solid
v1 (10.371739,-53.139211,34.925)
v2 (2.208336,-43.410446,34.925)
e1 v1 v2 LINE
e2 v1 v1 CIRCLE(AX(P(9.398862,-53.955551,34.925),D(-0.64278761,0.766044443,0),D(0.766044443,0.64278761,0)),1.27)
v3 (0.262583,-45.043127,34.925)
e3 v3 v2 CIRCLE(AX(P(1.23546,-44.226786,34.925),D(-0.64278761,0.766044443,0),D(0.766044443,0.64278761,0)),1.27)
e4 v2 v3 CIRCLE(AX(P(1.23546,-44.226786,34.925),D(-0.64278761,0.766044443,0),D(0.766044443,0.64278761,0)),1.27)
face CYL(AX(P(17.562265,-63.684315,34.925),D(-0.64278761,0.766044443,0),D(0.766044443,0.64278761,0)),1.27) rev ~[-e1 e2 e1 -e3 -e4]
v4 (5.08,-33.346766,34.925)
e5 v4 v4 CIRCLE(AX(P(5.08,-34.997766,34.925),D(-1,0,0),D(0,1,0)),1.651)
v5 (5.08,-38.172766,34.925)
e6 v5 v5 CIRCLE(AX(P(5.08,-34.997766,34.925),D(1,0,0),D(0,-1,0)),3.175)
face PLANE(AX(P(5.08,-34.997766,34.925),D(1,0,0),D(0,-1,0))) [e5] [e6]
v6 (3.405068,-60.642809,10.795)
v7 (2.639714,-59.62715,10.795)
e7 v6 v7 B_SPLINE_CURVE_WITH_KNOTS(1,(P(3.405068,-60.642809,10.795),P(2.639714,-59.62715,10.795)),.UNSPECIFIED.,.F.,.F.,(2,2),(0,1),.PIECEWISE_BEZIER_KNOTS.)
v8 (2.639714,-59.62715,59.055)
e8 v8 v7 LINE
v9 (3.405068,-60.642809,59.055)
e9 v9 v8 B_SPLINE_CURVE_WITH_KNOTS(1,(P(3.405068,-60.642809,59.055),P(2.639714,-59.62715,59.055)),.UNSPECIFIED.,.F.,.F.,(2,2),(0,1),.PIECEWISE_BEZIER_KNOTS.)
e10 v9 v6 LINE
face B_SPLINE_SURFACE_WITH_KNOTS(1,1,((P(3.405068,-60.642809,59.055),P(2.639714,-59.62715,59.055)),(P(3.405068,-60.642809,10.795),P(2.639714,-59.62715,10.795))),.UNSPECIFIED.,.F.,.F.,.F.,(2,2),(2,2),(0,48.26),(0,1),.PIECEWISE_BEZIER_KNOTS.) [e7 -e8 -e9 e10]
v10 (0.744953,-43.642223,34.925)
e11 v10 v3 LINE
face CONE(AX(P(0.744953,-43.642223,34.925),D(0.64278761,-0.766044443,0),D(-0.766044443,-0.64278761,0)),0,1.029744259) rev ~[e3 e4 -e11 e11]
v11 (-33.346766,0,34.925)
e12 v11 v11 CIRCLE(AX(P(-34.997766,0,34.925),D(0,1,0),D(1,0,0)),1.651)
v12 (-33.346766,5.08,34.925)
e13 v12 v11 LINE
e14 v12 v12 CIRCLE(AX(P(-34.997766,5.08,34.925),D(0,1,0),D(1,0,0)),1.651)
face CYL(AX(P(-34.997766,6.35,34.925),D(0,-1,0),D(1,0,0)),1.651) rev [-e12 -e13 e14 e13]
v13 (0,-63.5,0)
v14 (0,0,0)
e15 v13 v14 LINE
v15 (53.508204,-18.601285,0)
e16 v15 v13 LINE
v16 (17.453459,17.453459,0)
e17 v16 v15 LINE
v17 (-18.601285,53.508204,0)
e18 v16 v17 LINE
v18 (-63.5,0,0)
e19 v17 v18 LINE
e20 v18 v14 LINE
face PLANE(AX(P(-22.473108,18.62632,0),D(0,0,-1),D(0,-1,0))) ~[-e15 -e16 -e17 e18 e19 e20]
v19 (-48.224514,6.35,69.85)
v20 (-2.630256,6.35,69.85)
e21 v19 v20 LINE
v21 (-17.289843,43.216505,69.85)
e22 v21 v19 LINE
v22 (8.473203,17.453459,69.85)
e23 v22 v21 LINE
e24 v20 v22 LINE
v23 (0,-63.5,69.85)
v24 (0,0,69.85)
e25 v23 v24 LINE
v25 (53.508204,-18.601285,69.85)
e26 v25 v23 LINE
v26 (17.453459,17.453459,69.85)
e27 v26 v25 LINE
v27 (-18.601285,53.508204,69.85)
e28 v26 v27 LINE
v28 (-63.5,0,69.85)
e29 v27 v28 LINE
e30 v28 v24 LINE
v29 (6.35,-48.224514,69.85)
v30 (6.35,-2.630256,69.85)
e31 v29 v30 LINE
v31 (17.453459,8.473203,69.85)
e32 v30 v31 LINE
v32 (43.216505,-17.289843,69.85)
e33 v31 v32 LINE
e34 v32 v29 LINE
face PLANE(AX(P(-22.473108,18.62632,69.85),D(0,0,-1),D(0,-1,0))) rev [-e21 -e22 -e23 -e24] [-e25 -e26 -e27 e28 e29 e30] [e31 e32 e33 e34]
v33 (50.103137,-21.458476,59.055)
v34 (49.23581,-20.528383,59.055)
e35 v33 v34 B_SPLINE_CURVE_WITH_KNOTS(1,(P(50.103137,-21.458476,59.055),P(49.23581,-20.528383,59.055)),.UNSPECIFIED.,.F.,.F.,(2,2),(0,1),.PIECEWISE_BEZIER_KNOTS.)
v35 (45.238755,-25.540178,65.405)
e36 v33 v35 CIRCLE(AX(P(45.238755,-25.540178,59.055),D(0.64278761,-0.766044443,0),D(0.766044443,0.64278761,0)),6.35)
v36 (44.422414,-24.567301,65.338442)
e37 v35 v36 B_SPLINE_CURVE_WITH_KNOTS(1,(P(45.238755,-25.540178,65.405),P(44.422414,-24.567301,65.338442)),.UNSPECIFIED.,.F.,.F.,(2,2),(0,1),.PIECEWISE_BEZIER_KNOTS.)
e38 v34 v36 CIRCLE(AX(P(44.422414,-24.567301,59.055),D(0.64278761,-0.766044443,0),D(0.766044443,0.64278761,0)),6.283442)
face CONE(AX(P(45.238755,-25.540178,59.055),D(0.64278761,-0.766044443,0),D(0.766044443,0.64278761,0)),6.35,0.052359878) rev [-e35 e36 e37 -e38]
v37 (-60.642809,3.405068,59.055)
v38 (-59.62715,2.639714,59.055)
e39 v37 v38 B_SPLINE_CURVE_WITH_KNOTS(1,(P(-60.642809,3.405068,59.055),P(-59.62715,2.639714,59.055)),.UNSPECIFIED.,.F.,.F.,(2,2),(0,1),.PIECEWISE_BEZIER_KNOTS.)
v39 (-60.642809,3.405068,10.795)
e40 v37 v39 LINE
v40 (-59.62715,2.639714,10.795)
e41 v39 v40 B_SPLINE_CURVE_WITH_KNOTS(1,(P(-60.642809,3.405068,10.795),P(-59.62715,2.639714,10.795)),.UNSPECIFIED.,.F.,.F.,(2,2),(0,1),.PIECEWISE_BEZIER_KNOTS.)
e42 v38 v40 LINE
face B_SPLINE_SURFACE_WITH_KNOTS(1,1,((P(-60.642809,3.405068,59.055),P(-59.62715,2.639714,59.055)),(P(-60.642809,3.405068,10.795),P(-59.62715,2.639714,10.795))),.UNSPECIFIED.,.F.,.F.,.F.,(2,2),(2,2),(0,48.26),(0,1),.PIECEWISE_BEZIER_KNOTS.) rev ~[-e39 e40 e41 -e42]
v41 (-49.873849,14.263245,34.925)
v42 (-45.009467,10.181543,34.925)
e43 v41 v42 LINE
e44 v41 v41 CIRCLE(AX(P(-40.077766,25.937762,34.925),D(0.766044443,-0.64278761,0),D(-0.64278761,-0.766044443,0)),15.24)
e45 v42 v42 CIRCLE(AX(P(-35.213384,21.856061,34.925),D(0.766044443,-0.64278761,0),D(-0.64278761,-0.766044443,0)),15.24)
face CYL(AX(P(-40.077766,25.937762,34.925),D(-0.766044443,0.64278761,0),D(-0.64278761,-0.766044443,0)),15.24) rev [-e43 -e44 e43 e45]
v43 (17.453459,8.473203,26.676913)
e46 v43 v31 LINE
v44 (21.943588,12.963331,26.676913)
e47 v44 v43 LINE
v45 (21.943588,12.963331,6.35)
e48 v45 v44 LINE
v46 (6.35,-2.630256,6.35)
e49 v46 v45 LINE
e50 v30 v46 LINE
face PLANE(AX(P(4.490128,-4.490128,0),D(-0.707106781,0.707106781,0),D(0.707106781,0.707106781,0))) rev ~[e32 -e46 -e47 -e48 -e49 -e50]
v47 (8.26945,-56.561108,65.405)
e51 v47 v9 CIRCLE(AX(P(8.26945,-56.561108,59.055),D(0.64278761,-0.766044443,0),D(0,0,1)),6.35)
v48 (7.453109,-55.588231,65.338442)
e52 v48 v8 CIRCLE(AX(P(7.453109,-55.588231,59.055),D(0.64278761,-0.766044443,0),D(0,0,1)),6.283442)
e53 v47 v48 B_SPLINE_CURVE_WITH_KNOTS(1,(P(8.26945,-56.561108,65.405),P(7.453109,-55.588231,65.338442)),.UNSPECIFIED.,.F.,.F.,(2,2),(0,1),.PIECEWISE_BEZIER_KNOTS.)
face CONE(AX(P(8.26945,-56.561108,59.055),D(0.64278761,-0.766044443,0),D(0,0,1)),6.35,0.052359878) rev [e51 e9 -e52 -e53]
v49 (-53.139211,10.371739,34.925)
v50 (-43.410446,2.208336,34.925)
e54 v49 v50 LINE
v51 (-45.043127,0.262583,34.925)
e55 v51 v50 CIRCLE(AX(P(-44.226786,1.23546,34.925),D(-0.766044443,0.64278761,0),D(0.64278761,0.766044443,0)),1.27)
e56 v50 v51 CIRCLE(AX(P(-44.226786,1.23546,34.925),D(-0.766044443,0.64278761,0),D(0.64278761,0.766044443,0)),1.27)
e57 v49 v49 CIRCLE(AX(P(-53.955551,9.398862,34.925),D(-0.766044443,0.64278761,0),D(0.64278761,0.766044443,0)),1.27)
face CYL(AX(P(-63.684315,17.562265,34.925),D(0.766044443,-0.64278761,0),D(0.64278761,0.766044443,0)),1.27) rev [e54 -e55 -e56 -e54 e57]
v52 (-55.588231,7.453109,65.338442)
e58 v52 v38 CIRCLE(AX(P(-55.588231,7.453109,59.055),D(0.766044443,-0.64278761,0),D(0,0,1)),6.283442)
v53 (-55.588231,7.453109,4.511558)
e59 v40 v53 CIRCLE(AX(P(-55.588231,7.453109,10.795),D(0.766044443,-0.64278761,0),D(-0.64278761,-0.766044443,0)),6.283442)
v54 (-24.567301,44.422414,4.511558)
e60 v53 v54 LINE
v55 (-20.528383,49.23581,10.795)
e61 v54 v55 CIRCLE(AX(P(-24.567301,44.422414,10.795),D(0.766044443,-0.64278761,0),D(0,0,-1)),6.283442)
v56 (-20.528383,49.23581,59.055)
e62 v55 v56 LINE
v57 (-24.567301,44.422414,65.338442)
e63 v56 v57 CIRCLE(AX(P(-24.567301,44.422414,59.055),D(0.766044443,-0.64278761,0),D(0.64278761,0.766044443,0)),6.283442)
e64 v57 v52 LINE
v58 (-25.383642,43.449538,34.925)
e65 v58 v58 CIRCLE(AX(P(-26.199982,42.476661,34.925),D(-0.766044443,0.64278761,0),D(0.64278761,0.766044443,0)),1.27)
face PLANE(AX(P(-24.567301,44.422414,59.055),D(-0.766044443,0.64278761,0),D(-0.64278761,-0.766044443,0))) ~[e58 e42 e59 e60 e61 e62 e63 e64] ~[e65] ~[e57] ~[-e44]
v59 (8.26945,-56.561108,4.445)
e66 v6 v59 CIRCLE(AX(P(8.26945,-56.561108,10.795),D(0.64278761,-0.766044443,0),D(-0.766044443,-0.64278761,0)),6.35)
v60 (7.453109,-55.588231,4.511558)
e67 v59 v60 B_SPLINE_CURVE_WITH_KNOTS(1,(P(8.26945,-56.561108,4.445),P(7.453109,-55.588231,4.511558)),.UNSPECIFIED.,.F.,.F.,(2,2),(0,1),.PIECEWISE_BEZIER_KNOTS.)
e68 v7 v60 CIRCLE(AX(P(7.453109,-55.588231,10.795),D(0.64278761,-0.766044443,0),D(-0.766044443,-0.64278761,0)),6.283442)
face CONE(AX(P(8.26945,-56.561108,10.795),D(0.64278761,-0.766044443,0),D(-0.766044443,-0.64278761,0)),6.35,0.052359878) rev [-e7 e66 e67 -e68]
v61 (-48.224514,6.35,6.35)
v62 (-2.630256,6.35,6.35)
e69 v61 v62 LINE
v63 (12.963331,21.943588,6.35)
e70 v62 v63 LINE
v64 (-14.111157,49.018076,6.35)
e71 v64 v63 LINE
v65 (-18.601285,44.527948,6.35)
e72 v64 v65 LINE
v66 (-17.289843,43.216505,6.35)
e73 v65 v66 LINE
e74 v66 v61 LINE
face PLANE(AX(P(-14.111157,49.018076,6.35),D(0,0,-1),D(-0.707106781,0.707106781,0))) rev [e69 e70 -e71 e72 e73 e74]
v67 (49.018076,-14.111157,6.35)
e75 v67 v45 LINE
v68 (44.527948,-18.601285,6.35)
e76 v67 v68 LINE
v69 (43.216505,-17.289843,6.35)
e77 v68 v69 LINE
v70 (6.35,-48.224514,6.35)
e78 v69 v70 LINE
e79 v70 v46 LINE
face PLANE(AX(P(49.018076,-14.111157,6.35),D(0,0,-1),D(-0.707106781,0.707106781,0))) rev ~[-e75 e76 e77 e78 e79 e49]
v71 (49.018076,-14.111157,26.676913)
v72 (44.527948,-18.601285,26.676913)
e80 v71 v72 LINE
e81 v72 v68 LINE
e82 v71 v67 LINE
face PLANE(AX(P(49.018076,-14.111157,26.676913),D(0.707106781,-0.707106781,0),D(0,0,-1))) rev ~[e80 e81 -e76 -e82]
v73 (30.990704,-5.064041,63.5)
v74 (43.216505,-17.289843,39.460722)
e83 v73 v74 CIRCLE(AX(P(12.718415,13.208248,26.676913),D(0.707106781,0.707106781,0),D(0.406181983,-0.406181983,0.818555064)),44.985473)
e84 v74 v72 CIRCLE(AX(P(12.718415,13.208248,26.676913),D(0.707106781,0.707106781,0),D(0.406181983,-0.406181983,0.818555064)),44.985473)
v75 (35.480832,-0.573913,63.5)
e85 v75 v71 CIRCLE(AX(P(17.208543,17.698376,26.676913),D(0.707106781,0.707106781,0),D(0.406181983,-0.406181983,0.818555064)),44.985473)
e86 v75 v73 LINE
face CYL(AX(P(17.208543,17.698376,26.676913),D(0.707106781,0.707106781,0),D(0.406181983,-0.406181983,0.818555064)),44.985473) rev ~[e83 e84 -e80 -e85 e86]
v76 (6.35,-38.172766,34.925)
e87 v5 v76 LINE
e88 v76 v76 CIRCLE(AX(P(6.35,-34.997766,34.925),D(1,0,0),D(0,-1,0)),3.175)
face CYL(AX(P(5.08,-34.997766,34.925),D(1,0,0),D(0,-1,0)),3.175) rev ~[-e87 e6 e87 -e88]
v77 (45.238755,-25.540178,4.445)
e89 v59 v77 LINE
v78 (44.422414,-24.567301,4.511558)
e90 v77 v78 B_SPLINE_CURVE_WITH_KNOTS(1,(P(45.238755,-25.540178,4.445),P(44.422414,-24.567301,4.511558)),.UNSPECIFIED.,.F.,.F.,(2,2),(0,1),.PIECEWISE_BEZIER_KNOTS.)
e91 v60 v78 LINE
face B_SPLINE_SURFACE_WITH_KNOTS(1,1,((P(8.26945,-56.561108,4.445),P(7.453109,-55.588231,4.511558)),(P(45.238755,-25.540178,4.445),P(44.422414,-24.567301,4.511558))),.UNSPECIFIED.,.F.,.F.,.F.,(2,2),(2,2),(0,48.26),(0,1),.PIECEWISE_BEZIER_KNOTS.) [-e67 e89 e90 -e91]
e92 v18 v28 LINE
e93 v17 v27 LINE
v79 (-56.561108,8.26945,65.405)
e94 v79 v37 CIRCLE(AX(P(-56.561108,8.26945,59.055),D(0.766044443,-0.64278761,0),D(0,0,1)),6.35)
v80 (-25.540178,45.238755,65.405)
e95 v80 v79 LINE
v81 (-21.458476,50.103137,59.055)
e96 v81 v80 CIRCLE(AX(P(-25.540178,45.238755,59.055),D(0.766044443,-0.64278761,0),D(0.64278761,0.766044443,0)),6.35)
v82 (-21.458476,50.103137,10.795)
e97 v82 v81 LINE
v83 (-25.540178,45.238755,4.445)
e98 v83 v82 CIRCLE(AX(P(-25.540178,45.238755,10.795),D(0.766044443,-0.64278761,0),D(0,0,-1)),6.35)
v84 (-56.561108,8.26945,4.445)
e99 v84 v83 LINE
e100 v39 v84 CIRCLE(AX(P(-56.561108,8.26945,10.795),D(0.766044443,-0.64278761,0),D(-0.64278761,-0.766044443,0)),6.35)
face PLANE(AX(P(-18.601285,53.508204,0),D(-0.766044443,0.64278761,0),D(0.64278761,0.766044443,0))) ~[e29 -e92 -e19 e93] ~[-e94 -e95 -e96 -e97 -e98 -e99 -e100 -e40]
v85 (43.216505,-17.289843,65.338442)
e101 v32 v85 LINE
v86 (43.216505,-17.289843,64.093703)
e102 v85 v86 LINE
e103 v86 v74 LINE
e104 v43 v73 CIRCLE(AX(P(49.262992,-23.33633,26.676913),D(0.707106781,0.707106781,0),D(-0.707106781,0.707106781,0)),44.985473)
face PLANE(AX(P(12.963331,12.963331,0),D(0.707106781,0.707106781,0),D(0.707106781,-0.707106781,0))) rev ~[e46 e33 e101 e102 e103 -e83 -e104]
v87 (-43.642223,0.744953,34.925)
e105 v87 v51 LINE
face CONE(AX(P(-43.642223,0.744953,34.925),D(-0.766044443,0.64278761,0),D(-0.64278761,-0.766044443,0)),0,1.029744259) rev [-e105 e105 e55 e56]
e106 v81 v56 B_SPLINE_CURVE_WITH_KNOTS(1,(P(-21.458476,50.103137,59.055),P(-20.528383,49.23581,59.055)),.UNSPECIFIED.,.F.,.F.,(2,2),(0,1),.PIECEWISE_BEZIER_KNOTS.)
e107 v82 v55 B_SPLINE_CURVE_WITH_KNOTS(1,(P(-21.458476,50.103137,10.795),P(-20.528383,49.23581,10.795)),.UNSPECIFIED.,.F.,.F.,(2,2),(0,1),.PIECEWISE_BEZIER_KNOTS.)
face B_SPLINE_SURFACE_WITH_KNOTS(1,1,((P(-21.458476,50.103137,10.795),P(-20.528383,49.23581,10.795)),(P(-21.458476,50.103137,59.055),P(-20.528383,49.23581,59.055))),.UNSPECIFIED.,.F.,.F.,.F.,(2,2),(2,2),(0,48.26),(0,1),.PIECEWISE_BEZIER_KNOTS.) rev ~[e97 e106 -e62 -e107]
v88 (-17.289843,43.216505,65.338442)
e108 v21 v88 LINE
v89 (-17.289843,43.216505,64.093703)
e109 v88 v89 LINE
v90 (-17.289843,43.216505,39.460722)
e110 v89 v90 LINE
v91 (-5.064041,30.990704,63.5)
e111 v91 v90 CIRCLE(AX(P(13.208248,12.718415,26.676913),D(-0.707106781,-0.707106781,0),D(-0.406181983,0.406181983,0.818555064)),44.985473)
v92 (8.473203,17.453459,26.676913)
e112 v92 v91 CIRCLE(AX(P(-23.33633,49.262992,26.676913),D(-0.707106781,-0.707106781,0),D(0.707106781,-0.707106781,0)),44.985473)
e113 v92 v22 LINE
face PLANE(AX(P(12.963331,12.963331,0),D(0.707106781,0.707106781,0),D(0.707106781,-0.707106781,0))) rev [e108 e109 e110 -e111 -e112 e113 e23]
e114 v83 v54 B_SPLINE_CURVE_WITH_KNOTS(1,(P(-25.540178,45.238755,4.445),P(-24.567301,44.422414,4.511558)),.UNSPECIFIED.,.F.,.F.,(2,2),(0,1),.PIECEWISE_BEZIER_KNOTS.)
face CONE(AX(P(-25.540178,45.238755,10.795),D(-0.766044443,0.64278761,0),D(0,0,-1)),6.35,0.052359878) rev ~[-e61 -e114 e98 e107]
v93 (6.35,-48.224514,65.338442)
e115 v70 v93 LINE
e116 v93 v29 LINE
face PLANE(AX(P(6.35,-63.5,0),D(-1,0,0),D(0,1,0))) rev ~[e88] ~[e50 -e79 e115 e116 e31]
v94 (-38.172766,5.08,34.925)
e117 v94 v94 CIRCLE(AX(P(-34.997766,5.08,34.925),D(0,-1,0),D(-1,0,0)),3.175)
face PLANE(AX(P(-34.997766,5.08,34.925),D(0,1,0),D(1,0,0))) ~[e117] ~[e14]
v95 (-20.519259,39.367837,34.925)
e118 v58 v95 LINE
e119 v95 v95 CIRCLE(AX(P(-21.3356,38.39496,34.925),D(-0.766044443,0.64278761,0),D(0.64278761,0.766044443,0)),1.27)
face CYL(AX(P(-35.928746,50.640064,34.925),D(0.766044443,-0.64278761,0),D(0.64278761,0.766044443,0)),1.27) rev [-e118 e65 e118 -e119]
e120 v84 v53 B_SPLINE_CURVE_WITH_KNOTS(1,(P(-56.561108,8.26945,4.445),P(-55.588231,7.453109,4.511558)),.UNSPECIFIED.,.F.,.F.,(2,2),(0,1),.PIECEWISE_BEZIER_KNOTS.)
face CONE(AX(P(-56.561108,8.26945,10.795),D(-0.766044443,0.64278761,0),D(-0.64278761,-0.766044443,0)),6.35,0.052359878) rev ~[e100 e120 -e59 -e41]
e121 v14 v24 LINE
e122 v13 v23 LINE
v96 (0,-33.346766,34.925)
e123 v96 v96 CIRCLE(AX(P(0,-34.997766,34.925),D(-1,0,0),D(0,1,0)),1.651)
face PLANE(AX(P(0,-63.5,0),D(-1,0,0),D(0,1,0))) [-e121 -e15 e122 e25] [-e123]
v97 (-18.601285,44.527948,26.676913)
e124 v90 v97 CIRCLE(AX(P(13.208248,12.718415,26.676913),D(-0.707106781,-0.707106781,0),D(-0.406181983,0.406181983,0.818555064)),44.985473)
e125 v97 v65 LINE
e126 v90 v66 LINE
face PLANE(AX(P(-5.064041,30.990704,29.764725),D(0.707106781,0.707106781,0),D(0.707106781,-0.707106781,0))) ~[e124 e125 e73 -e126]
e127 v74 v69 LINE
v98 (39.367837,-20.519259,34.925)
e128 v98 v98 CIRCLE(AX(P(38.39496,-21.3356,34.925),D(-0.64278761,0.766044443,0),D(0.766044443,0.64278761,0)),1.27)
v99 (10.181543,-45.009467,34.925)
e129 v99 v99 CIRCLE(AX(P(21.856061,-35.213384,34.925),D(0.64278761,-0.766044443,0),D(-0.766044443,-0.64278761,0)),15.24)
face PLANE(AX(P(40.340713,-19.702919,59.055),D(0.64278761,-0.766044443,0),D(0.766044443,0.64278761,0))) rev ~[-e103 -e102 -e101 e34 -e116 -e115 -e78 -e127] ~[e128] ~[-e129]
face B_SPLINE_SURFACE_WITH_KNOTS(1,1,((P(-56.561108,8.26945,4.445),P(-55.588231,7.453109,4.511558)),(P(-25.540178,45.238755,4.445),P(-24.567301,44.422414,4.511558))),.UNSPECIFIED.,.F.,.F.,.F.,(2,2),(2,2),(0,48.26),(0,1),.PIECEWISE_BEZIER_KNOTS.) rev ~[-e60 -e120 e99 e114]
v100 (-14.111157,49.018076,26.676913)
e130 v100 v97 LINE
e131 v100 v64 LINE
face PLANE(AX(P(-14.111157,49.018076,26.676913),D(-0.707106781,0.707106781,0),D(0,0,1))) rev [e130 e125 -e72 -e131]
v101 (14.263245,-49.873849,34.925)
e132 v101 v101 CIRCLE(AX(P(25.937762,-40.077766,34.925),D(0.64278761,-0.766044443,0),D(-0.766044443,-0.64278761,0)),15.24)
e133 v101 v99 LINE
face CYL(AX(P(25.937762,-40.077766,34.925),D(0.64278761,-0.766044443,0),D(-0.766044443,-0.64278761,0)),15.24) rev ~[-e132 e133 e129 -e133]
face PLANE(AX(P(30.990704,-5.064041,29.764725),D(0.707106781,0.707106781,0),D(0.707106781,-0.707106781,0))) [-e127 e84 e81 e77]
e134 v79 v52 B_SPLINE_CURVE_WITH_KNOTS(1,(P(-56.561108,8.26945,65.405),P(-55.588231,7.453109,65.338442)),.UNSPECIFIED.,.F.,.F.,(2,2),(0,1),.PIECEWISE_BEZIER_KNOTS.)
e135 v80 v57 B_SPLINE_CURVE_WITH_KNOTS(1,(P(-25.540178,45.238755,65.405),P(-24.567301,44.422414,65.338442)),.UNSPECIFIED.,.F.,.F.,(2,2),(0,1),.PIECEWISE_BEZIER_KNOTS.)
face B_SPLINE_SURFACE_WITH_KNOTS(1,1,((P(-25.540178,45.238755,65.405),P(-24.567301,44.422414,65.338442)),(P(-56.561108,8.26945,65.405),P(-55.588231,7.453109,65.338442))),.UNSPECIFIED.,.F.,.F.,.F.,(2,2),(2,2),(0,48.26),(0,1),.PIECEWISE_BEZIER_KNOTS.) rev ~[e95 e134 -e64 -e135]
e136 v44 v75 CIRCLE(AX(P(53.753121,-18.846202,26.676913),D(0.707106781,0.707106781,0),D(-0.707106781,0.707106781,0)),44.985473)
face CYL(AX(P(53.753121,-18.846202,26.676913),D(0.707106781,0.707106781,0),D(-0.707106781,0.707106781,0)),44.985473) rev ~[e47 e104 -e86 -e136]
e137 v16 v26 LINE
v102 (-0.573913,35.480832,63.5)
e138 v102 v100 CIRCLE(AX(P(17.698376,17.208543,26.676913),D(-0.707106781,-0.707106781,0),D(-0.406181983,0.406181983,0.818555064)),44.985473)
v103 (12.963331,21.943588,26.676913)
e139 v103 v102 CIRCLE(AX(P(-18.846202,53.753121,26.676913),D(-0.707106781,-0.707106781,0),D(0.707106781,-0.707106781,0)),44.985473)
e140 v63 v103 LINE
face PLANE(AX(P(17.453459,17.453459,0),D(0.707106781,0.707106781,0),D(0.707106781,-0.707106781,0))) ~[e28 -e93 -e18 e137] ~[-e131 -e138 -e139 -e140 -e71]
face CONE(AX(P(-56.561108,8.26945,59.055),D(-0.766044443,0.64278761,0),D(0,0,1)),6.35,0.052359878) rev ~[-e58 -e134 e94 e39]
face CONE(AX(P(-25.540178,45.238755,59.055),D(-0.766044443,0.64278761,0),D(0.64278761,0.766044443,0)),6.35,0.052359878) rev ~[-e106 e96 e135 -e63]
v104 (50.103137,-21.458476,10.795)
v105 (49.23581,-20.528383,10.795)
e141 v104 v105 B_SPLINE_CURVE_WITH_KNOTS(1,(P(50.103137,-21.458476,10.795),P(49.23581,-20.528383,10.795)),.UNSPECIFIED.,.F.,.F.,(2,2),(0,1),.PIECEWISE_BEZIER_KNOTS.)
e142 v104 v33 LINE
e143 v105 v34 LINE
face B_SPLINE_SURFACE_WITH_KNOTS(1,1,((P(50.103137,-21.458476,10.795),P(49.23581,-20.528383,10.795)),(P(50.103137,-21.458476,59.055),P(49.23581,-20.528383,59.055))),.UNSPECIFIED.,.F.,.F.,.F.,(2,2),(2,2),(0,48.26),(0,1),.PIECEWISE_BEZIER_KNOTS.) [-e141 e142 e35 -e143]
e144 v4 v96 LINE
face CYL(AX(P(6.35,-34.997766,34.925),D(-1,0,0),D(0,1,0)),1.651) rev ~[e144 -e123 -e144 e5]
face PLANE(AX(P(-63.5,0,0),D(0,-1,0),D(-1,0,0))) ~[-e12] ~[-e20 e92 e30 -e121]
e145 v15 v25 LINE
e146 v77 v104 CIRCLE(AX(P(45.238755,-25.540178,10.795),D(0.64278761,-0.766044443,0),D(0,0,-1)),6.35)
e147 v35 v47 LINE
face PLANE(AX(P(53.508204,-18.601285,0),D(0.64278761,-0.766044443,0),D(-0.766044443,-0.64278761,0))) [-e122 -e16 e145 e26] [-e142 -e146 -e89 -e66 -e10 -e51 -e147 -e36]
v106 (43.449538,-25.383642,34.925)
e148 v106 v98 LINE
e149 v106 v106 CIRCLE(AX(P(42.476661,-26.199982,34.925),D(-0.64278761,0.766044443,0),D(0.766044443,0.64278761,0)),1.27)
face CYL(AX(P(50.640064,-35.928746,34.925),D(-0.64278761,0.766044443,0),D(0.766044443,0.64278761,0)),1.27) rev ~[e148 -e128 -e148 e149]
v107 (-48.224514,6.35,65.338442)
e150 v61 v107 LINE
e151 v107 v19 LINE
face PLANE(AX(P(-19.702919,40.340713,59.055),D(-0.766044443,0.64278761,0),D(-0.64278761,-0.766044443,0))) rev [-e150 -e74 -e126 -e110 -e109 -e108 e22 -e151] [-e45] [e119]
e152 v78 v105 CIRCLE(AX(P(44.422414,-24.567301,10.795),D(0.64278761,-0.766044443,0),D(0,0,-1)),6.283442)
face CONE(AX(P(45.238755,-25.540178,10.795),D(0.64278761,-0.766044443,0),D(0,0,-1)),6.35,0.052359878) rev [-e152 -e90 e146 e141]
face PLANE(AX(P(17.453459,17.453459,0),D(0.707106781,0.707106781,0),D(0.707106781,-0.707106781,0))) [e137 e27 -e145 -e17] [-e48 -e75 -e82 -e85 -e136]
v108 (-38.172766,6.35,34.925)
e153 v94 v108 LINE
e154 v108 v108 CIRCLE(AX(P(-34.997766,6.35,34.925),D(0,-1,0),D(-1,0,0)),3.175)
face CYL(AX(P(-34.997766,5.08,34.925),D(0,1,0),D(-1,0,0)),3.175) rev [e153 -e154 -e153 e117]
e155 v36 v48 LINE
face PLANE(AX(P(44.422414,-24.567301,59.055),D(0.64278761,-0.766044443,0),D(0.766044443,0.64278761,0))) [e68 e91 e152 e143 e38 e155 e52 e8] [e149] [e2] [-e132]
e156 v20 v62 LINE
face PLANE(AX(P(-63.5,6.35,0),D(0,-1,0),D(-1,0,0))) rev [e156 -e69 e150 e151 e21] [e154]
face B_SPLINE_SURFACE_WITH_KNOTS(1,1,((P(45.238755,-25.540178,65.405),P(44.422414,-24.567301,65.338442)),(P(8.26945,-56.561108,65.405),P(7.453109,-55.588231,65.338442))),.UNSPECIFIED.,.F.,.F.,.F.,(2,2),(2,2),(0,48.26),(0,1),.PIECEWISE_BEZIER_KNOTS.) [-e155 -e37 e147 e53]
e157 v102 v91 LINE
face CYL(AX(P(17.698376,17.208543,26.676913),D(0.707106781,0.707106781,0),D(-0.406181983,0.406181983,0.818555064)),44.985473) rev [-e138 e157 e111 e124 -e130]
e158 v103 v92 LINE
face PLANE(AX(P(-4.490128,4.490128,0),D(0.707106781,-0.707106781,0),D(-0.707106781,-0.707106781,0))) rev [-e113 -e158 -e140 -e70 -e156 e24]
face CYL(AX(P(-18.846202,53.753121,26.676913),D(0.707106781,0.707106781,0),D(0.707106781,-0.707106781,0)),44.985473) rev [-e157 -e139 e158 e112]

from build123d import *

# Parameters (mm, degrees)
F1_DEPTH        = 69.85
F3_DEPTH        = 1.27
F3_TAPER        = 3
F4_T            = 6.35
F4_T3_DEPTH     = 60.96
F4_T5_DEPTH     = 60.96
F4_T7_DEPTH     = 60.96
F4_T10_ANGLE    = 90.000000001
F4_T12_ANGLE    = 90.000000001
F4_T14_ANGLE    = 90.000000001
F4_T16_ANGLE    = 90.000000001
F6_DEPTH        = 6.35
F8_D            = 2.54
F8_DEPTH        = 12.7
F8_TIP          = 0.7630929862
F7_R            = 15.24
F9_DEPTH        = 6.3499999999
F11_D           = 3.302
F11_DEPTH       = 12.7
F11_CBORE_D     = 6.35
F11_CBORE_DEPTH = 1.27
F11_TIP         = 0.992020882
F13_ANGLE       = 180


# Not quite as in the source:
# - a shell that OpenCascade refuses in one call is made with other operations: the cavity is built on its own and cut out


with BuildPart() as f1:
    # F0 (on Top) → F1 (new body)
    with BuildSketch(Plane.XY):
        Polygon((0, 63.5), (0, 0), (17.4534594442, -17.4534594442), (53.5082043519, 18.6012854634), align=None)
    extrude(amount=-F1_DEPTH)

    # F2 (on face) → F3 (cut)
    with BuildSketch(Plane(origin=(31.2676461581, 37.2633296409, 0), x_dir=(-0.7660444431, 0.6427876097, 0), z_dir=(0.6427876097, 0.7660444431, 0))):
        with BuildLine():
            ThreePointArc((-24.5879867849, -59.055), (-22.7281148454, -63.5451280605), (-18.2379867849, -65.405))
            Line((-18.2379867849, -65.405), (30.0220132151, -65.405))
            ThreePointArc((30.0220132151, -65.405), (34.5121412756, -63.5451280605), (36.3720132151, -59.055))
            Line((36.3720132151, -59.055), (36.3720132151, -10.795))
            ThreePointArc((36.3720132151, -10.795), (34.5121412756, -6.3048719395), (30.0220132151, -4.445))
            Line((30.0220132151, -4.445), (-18.2379867849, -4.445))
            ThreePointArc((-18.2379867849, -4.445), (-22.7281148454, -6.3048719395), (-24.5879867849, -10.795))
            Line((-24.5879867849, -10.795), (-24.5879867849, -59.055))
        make_face()
    extrude(amount=-F3_DEPTH, taper=F3_TAPER, mode=Mode.SUBTRACT)

    # F4: shell of thickness 6.35, made by hand


with BuildPart() as f4_core1:
    # F4_t2: copy of F1
    add(f1.part)

    # the walls: a layer under each face that stays
    f4_faces = [f4_core1.faces().sort_by_distance(p)[0] for p in [
        (49.6861897553, 21.8083365017, -64.8607142857),
        (35.480831898, 0.5739130096, -34.925),
        (26.7541021759, 23.0232702779, 0),
        (0, 31.75, -34.925),
        (48.2521957288, 22.1826667317, -63.5215962965),
        (26.3459320438, 40.5642045103, -65.3717210602),
        (4.4396683587, 58.9457422889, -63.5215962965),
        (3.0223905645, 60.1349795634, -34.925),
        (4.4396683587, 58.9457422889, -6.3284037035),
        (26.3459320438, 40.5642045103, -4.4782789398),
        (48.2521957288, 22.1826667317, -6.3284037035),
        (49.6694735231, 20.9934294573, -34.925),
        (8.7267297221, -8.7267297221, -34.925),
        (25.9377619116, 40.0777662889, -34.925),
    ]]
    thicken(f4_faces, amount=-F4_T, mode=Mode.SUBTRACT)

    # F4_s4 → F4_t3 (cut)
    with BuildSketch(Plane(origin=(18.8354906441, -15.8048532525, 0), x_dir=(0, 0, 1), z_dir=(-0.7660444431, 0.6427876097, 0))):
        Polygon((-65.2750291449, 47.4406454713), (-71.679739666, 47.0414888159), (-71.3643671189, 41.0238221381), (-65.3384421203, 41.0238221381), align=None)
    extrude(amount=F4_T3_DEPTH, mode=Mode.SUBTRACT)

    # F4_s6 → F4_t5 (cut)
    with BuildSketch(Plane.XY.offset(-65.405)):
        Polygon((2.7312439473, 59.63757862), (-2.4316219096, 63.4486754488), (-6.0581141021, 58.636157764), (-1.4419877423, 54.762767838), align=None)
        Polygon((49.2301862972, 20.6203332441), (53.8799062493, 16.1976929397), (49.7702352824, 11.7906103863), (45.1541089225, 15.6640003123), align=None)
    extrude(amount=F4_T5_DEPTH, mode=Mode.SUBTRACT)

    # F4_s8 → F4_t7 (cut)
    with BuildSketch(Plane(origin=(-27.8625786085, 23.379479434, 0), x_dir=(0, 0, 1), z_dir=(0.7660444431, -0.6427876097, 0))):
        Polygon((-4.5749708551, -47.4406454713), (1.829739666, -47.0414888159), (1.514367119, -41.0238221381), (-4.5115578797, -41.0238221381), align=None)
    extrude(amount=F4_T7_DEPTH, mode=Mode.SUBTRACT)

    # F4_s9 → F4_t10 (revolve, cut)
    with BuildSketch(Plane.XY.offset(-59.055)):
        Polygon((49.2301862972, 20.6203332441), (53.8799062493, 16.1976929397), (49.7702352824, 11.7906103863), (45.1541089225, 15.6640003123), align=None)
    revolve(axis=Axis((44.4224143241, 24.5673012672, -59.055), (0.6427876097, 0.7660444431, 0)), revolution_arc=F4_T10_ANGLE, mode=Mode.SUBTRACT)

    # F4_s11 → F4_t12 (revolve, cut)
    with BuildSketch(Plane(origin=(-22.9981963947, 19.2977781125, 0), x_dir=(0, 0, 1), z_dir=(0.7660444431, -0.6427876097, 0))):
        Polygon((-65.2750291449, -47.4406454713), (-71.679739666, -47.0414888159), (-71.364367119, -41.0238221381), (-65.3384421203, -41.0238221381), align=None)
    revolve(axis=Axis((7.4531094992, 55.5882313107, -59.055), (0.6427876097, 0.7660444431, 0)), revolution_arc=F4_T12_ANGLE, mode=Mode.SUBTRACT)

    # F4_s13 → F4_t14 (revolve, cut)
    with BuildSketch(Plane.XY.offset(-10.795)):
        Polygon((2.7312439473, 59.63757862), (-2.4316219096, 63.4486754488), (-6.0581141021, 58.636157764), (-1.4419877423, 54.762767838), align=None)
    revolve(axis=Axis((7.4531094992, 55.5882313107, -10.795), (0.6427876097, 0.7660444431, 0)), revolution_arc=F4_T14_ANGLE, mode=Mode.SUBTRACT)

    # F4_s15 → F4_t16 (revolve, cut)
    with BuildSketch(Plane(origin=(13.9711084303, -11.723151931, 0), x_dir=(0, 0, 1), z_dir=(-0.7660444431, 0.6427876097, 0))):
        Polygon((-4.5749708551, 47.4406454713), (1.829739666, 47.0414888159), (1.514367119, 41.0238221381), (-4.5115578797, 41.0238221381), align=None)
    revolve(axis=Axis((44.4224143241, 24.5673012672, -10.795), (0.6427876097, 0.7660444431, 0)), revolution_arc=F4_T16_ANGLE, mode=Mode.SUBTRACT)


with BuildPart() as f1_1:
    add(f1.part)

    # what is left inside the walls is the cavity
    f4_cavity = [f4_core1.part.solids().sort_by_distance(p)[0] for p in [
        (24.742436, 32.708534, -27.516667),
    ]]
    add(f4_cavity, mode=Mode.SUBTRACT)

    # F5 (on face) → F6 (cut, through all)
    with BuildSketch(Plane(origin=(17.4534594442, -17.4534594442, 0), x_dir=(0.7071067812, 0.7071067812, 0), z_dir=(0.7071067812, -0.7071067812, 0))):
        with BuildLine():
            Line((44.6391092363, -6.35), (6.35, -6.35))
            Line((6.35, -6.35), (6.35, -26.6769132179))
            ThreePointArc((6.35, -26.6769132179), (11.4220747655, -47.42814024), (25.4945546181, -63.5))
            ThreePointArc((25.4945546181, -63.5), (39.5670344708, -47.42814024), (44.6391092363, -26.6769132179))
            Line((44.6391092363, -26.6769132179), (44.6391092363, -6.35))
        make_face()
    extrude(amount=-F6_DEPTH, mode=Mode.SUBTRACT)

    # F8
    with Locations(Plane(origin=(30.4513058938, 36.2904531982, 0), x_dir=(-0.7660444431, 0.6427876097, 0), z_dir=(0.6427876097, 0.7660444431, 0))):
        with Locations((27.4820132151, -34.925), (-15.6979867849, -34.925)):
            Hole(F8_D / 2, depth=F8_DEPTH)
            with Locations((0, 0, -(F8_DEPTH + F8_TIP / 2))):  # 118° drill point
                Cone(0, F8_D / 2, F8_TIP, mode=Mode.SUBTRACT)

    # F7 (on face) → F9 (cut, through all)
    with BuildSketch(Plane(origin=(30.4513058938, 36.2904531982, 0), x_dir=(-0.7660444431, 0.6427876097, 0), z_dir=(0.6427876097, 0.7660444431, 0))):
        with Locations((5.8920132151, -34.925)):
            Circle(F7_R)
    extrude(amount=-F9_DEPTH, mode=Mode.SUBTRACT)

    # F11
    with Locations(Plane.YZ.offset(6.35)):
        with Locations((34.9977662889, -34.925)):
            CounterBoreHole(F11_D / 2, F11_CBORE_D / 2, F11_CBORE_DEPTH, depth=F11_DEPTH)
            with Locations((0, 0, -(F11_DEPTH + F11_TIP / 2))):  # 118° drill point
                Cone(0, F11_D / 2, F11_TIP, mode=Mode.SUBTRACT)

    # F12: F1 across face


with BuildPart() as f1_2:
    add(f1_1.part)
    add(f1_1.part.mirror(Plane(origin=(8.7267297221, -8.7267297221, -34.925), x_dir=(0.7071067812, -0.7071067812, 0), z_dir=(-0.7071067812, -0.7071067812, 0))))


with BuildPart() as f1_3:
    # F13: moved
    add(f1_2.part.rotate(Axis((-31.75, 0, 0), (-1, 0, 0)), F13_ANGLE))


solid = f1_3.part
